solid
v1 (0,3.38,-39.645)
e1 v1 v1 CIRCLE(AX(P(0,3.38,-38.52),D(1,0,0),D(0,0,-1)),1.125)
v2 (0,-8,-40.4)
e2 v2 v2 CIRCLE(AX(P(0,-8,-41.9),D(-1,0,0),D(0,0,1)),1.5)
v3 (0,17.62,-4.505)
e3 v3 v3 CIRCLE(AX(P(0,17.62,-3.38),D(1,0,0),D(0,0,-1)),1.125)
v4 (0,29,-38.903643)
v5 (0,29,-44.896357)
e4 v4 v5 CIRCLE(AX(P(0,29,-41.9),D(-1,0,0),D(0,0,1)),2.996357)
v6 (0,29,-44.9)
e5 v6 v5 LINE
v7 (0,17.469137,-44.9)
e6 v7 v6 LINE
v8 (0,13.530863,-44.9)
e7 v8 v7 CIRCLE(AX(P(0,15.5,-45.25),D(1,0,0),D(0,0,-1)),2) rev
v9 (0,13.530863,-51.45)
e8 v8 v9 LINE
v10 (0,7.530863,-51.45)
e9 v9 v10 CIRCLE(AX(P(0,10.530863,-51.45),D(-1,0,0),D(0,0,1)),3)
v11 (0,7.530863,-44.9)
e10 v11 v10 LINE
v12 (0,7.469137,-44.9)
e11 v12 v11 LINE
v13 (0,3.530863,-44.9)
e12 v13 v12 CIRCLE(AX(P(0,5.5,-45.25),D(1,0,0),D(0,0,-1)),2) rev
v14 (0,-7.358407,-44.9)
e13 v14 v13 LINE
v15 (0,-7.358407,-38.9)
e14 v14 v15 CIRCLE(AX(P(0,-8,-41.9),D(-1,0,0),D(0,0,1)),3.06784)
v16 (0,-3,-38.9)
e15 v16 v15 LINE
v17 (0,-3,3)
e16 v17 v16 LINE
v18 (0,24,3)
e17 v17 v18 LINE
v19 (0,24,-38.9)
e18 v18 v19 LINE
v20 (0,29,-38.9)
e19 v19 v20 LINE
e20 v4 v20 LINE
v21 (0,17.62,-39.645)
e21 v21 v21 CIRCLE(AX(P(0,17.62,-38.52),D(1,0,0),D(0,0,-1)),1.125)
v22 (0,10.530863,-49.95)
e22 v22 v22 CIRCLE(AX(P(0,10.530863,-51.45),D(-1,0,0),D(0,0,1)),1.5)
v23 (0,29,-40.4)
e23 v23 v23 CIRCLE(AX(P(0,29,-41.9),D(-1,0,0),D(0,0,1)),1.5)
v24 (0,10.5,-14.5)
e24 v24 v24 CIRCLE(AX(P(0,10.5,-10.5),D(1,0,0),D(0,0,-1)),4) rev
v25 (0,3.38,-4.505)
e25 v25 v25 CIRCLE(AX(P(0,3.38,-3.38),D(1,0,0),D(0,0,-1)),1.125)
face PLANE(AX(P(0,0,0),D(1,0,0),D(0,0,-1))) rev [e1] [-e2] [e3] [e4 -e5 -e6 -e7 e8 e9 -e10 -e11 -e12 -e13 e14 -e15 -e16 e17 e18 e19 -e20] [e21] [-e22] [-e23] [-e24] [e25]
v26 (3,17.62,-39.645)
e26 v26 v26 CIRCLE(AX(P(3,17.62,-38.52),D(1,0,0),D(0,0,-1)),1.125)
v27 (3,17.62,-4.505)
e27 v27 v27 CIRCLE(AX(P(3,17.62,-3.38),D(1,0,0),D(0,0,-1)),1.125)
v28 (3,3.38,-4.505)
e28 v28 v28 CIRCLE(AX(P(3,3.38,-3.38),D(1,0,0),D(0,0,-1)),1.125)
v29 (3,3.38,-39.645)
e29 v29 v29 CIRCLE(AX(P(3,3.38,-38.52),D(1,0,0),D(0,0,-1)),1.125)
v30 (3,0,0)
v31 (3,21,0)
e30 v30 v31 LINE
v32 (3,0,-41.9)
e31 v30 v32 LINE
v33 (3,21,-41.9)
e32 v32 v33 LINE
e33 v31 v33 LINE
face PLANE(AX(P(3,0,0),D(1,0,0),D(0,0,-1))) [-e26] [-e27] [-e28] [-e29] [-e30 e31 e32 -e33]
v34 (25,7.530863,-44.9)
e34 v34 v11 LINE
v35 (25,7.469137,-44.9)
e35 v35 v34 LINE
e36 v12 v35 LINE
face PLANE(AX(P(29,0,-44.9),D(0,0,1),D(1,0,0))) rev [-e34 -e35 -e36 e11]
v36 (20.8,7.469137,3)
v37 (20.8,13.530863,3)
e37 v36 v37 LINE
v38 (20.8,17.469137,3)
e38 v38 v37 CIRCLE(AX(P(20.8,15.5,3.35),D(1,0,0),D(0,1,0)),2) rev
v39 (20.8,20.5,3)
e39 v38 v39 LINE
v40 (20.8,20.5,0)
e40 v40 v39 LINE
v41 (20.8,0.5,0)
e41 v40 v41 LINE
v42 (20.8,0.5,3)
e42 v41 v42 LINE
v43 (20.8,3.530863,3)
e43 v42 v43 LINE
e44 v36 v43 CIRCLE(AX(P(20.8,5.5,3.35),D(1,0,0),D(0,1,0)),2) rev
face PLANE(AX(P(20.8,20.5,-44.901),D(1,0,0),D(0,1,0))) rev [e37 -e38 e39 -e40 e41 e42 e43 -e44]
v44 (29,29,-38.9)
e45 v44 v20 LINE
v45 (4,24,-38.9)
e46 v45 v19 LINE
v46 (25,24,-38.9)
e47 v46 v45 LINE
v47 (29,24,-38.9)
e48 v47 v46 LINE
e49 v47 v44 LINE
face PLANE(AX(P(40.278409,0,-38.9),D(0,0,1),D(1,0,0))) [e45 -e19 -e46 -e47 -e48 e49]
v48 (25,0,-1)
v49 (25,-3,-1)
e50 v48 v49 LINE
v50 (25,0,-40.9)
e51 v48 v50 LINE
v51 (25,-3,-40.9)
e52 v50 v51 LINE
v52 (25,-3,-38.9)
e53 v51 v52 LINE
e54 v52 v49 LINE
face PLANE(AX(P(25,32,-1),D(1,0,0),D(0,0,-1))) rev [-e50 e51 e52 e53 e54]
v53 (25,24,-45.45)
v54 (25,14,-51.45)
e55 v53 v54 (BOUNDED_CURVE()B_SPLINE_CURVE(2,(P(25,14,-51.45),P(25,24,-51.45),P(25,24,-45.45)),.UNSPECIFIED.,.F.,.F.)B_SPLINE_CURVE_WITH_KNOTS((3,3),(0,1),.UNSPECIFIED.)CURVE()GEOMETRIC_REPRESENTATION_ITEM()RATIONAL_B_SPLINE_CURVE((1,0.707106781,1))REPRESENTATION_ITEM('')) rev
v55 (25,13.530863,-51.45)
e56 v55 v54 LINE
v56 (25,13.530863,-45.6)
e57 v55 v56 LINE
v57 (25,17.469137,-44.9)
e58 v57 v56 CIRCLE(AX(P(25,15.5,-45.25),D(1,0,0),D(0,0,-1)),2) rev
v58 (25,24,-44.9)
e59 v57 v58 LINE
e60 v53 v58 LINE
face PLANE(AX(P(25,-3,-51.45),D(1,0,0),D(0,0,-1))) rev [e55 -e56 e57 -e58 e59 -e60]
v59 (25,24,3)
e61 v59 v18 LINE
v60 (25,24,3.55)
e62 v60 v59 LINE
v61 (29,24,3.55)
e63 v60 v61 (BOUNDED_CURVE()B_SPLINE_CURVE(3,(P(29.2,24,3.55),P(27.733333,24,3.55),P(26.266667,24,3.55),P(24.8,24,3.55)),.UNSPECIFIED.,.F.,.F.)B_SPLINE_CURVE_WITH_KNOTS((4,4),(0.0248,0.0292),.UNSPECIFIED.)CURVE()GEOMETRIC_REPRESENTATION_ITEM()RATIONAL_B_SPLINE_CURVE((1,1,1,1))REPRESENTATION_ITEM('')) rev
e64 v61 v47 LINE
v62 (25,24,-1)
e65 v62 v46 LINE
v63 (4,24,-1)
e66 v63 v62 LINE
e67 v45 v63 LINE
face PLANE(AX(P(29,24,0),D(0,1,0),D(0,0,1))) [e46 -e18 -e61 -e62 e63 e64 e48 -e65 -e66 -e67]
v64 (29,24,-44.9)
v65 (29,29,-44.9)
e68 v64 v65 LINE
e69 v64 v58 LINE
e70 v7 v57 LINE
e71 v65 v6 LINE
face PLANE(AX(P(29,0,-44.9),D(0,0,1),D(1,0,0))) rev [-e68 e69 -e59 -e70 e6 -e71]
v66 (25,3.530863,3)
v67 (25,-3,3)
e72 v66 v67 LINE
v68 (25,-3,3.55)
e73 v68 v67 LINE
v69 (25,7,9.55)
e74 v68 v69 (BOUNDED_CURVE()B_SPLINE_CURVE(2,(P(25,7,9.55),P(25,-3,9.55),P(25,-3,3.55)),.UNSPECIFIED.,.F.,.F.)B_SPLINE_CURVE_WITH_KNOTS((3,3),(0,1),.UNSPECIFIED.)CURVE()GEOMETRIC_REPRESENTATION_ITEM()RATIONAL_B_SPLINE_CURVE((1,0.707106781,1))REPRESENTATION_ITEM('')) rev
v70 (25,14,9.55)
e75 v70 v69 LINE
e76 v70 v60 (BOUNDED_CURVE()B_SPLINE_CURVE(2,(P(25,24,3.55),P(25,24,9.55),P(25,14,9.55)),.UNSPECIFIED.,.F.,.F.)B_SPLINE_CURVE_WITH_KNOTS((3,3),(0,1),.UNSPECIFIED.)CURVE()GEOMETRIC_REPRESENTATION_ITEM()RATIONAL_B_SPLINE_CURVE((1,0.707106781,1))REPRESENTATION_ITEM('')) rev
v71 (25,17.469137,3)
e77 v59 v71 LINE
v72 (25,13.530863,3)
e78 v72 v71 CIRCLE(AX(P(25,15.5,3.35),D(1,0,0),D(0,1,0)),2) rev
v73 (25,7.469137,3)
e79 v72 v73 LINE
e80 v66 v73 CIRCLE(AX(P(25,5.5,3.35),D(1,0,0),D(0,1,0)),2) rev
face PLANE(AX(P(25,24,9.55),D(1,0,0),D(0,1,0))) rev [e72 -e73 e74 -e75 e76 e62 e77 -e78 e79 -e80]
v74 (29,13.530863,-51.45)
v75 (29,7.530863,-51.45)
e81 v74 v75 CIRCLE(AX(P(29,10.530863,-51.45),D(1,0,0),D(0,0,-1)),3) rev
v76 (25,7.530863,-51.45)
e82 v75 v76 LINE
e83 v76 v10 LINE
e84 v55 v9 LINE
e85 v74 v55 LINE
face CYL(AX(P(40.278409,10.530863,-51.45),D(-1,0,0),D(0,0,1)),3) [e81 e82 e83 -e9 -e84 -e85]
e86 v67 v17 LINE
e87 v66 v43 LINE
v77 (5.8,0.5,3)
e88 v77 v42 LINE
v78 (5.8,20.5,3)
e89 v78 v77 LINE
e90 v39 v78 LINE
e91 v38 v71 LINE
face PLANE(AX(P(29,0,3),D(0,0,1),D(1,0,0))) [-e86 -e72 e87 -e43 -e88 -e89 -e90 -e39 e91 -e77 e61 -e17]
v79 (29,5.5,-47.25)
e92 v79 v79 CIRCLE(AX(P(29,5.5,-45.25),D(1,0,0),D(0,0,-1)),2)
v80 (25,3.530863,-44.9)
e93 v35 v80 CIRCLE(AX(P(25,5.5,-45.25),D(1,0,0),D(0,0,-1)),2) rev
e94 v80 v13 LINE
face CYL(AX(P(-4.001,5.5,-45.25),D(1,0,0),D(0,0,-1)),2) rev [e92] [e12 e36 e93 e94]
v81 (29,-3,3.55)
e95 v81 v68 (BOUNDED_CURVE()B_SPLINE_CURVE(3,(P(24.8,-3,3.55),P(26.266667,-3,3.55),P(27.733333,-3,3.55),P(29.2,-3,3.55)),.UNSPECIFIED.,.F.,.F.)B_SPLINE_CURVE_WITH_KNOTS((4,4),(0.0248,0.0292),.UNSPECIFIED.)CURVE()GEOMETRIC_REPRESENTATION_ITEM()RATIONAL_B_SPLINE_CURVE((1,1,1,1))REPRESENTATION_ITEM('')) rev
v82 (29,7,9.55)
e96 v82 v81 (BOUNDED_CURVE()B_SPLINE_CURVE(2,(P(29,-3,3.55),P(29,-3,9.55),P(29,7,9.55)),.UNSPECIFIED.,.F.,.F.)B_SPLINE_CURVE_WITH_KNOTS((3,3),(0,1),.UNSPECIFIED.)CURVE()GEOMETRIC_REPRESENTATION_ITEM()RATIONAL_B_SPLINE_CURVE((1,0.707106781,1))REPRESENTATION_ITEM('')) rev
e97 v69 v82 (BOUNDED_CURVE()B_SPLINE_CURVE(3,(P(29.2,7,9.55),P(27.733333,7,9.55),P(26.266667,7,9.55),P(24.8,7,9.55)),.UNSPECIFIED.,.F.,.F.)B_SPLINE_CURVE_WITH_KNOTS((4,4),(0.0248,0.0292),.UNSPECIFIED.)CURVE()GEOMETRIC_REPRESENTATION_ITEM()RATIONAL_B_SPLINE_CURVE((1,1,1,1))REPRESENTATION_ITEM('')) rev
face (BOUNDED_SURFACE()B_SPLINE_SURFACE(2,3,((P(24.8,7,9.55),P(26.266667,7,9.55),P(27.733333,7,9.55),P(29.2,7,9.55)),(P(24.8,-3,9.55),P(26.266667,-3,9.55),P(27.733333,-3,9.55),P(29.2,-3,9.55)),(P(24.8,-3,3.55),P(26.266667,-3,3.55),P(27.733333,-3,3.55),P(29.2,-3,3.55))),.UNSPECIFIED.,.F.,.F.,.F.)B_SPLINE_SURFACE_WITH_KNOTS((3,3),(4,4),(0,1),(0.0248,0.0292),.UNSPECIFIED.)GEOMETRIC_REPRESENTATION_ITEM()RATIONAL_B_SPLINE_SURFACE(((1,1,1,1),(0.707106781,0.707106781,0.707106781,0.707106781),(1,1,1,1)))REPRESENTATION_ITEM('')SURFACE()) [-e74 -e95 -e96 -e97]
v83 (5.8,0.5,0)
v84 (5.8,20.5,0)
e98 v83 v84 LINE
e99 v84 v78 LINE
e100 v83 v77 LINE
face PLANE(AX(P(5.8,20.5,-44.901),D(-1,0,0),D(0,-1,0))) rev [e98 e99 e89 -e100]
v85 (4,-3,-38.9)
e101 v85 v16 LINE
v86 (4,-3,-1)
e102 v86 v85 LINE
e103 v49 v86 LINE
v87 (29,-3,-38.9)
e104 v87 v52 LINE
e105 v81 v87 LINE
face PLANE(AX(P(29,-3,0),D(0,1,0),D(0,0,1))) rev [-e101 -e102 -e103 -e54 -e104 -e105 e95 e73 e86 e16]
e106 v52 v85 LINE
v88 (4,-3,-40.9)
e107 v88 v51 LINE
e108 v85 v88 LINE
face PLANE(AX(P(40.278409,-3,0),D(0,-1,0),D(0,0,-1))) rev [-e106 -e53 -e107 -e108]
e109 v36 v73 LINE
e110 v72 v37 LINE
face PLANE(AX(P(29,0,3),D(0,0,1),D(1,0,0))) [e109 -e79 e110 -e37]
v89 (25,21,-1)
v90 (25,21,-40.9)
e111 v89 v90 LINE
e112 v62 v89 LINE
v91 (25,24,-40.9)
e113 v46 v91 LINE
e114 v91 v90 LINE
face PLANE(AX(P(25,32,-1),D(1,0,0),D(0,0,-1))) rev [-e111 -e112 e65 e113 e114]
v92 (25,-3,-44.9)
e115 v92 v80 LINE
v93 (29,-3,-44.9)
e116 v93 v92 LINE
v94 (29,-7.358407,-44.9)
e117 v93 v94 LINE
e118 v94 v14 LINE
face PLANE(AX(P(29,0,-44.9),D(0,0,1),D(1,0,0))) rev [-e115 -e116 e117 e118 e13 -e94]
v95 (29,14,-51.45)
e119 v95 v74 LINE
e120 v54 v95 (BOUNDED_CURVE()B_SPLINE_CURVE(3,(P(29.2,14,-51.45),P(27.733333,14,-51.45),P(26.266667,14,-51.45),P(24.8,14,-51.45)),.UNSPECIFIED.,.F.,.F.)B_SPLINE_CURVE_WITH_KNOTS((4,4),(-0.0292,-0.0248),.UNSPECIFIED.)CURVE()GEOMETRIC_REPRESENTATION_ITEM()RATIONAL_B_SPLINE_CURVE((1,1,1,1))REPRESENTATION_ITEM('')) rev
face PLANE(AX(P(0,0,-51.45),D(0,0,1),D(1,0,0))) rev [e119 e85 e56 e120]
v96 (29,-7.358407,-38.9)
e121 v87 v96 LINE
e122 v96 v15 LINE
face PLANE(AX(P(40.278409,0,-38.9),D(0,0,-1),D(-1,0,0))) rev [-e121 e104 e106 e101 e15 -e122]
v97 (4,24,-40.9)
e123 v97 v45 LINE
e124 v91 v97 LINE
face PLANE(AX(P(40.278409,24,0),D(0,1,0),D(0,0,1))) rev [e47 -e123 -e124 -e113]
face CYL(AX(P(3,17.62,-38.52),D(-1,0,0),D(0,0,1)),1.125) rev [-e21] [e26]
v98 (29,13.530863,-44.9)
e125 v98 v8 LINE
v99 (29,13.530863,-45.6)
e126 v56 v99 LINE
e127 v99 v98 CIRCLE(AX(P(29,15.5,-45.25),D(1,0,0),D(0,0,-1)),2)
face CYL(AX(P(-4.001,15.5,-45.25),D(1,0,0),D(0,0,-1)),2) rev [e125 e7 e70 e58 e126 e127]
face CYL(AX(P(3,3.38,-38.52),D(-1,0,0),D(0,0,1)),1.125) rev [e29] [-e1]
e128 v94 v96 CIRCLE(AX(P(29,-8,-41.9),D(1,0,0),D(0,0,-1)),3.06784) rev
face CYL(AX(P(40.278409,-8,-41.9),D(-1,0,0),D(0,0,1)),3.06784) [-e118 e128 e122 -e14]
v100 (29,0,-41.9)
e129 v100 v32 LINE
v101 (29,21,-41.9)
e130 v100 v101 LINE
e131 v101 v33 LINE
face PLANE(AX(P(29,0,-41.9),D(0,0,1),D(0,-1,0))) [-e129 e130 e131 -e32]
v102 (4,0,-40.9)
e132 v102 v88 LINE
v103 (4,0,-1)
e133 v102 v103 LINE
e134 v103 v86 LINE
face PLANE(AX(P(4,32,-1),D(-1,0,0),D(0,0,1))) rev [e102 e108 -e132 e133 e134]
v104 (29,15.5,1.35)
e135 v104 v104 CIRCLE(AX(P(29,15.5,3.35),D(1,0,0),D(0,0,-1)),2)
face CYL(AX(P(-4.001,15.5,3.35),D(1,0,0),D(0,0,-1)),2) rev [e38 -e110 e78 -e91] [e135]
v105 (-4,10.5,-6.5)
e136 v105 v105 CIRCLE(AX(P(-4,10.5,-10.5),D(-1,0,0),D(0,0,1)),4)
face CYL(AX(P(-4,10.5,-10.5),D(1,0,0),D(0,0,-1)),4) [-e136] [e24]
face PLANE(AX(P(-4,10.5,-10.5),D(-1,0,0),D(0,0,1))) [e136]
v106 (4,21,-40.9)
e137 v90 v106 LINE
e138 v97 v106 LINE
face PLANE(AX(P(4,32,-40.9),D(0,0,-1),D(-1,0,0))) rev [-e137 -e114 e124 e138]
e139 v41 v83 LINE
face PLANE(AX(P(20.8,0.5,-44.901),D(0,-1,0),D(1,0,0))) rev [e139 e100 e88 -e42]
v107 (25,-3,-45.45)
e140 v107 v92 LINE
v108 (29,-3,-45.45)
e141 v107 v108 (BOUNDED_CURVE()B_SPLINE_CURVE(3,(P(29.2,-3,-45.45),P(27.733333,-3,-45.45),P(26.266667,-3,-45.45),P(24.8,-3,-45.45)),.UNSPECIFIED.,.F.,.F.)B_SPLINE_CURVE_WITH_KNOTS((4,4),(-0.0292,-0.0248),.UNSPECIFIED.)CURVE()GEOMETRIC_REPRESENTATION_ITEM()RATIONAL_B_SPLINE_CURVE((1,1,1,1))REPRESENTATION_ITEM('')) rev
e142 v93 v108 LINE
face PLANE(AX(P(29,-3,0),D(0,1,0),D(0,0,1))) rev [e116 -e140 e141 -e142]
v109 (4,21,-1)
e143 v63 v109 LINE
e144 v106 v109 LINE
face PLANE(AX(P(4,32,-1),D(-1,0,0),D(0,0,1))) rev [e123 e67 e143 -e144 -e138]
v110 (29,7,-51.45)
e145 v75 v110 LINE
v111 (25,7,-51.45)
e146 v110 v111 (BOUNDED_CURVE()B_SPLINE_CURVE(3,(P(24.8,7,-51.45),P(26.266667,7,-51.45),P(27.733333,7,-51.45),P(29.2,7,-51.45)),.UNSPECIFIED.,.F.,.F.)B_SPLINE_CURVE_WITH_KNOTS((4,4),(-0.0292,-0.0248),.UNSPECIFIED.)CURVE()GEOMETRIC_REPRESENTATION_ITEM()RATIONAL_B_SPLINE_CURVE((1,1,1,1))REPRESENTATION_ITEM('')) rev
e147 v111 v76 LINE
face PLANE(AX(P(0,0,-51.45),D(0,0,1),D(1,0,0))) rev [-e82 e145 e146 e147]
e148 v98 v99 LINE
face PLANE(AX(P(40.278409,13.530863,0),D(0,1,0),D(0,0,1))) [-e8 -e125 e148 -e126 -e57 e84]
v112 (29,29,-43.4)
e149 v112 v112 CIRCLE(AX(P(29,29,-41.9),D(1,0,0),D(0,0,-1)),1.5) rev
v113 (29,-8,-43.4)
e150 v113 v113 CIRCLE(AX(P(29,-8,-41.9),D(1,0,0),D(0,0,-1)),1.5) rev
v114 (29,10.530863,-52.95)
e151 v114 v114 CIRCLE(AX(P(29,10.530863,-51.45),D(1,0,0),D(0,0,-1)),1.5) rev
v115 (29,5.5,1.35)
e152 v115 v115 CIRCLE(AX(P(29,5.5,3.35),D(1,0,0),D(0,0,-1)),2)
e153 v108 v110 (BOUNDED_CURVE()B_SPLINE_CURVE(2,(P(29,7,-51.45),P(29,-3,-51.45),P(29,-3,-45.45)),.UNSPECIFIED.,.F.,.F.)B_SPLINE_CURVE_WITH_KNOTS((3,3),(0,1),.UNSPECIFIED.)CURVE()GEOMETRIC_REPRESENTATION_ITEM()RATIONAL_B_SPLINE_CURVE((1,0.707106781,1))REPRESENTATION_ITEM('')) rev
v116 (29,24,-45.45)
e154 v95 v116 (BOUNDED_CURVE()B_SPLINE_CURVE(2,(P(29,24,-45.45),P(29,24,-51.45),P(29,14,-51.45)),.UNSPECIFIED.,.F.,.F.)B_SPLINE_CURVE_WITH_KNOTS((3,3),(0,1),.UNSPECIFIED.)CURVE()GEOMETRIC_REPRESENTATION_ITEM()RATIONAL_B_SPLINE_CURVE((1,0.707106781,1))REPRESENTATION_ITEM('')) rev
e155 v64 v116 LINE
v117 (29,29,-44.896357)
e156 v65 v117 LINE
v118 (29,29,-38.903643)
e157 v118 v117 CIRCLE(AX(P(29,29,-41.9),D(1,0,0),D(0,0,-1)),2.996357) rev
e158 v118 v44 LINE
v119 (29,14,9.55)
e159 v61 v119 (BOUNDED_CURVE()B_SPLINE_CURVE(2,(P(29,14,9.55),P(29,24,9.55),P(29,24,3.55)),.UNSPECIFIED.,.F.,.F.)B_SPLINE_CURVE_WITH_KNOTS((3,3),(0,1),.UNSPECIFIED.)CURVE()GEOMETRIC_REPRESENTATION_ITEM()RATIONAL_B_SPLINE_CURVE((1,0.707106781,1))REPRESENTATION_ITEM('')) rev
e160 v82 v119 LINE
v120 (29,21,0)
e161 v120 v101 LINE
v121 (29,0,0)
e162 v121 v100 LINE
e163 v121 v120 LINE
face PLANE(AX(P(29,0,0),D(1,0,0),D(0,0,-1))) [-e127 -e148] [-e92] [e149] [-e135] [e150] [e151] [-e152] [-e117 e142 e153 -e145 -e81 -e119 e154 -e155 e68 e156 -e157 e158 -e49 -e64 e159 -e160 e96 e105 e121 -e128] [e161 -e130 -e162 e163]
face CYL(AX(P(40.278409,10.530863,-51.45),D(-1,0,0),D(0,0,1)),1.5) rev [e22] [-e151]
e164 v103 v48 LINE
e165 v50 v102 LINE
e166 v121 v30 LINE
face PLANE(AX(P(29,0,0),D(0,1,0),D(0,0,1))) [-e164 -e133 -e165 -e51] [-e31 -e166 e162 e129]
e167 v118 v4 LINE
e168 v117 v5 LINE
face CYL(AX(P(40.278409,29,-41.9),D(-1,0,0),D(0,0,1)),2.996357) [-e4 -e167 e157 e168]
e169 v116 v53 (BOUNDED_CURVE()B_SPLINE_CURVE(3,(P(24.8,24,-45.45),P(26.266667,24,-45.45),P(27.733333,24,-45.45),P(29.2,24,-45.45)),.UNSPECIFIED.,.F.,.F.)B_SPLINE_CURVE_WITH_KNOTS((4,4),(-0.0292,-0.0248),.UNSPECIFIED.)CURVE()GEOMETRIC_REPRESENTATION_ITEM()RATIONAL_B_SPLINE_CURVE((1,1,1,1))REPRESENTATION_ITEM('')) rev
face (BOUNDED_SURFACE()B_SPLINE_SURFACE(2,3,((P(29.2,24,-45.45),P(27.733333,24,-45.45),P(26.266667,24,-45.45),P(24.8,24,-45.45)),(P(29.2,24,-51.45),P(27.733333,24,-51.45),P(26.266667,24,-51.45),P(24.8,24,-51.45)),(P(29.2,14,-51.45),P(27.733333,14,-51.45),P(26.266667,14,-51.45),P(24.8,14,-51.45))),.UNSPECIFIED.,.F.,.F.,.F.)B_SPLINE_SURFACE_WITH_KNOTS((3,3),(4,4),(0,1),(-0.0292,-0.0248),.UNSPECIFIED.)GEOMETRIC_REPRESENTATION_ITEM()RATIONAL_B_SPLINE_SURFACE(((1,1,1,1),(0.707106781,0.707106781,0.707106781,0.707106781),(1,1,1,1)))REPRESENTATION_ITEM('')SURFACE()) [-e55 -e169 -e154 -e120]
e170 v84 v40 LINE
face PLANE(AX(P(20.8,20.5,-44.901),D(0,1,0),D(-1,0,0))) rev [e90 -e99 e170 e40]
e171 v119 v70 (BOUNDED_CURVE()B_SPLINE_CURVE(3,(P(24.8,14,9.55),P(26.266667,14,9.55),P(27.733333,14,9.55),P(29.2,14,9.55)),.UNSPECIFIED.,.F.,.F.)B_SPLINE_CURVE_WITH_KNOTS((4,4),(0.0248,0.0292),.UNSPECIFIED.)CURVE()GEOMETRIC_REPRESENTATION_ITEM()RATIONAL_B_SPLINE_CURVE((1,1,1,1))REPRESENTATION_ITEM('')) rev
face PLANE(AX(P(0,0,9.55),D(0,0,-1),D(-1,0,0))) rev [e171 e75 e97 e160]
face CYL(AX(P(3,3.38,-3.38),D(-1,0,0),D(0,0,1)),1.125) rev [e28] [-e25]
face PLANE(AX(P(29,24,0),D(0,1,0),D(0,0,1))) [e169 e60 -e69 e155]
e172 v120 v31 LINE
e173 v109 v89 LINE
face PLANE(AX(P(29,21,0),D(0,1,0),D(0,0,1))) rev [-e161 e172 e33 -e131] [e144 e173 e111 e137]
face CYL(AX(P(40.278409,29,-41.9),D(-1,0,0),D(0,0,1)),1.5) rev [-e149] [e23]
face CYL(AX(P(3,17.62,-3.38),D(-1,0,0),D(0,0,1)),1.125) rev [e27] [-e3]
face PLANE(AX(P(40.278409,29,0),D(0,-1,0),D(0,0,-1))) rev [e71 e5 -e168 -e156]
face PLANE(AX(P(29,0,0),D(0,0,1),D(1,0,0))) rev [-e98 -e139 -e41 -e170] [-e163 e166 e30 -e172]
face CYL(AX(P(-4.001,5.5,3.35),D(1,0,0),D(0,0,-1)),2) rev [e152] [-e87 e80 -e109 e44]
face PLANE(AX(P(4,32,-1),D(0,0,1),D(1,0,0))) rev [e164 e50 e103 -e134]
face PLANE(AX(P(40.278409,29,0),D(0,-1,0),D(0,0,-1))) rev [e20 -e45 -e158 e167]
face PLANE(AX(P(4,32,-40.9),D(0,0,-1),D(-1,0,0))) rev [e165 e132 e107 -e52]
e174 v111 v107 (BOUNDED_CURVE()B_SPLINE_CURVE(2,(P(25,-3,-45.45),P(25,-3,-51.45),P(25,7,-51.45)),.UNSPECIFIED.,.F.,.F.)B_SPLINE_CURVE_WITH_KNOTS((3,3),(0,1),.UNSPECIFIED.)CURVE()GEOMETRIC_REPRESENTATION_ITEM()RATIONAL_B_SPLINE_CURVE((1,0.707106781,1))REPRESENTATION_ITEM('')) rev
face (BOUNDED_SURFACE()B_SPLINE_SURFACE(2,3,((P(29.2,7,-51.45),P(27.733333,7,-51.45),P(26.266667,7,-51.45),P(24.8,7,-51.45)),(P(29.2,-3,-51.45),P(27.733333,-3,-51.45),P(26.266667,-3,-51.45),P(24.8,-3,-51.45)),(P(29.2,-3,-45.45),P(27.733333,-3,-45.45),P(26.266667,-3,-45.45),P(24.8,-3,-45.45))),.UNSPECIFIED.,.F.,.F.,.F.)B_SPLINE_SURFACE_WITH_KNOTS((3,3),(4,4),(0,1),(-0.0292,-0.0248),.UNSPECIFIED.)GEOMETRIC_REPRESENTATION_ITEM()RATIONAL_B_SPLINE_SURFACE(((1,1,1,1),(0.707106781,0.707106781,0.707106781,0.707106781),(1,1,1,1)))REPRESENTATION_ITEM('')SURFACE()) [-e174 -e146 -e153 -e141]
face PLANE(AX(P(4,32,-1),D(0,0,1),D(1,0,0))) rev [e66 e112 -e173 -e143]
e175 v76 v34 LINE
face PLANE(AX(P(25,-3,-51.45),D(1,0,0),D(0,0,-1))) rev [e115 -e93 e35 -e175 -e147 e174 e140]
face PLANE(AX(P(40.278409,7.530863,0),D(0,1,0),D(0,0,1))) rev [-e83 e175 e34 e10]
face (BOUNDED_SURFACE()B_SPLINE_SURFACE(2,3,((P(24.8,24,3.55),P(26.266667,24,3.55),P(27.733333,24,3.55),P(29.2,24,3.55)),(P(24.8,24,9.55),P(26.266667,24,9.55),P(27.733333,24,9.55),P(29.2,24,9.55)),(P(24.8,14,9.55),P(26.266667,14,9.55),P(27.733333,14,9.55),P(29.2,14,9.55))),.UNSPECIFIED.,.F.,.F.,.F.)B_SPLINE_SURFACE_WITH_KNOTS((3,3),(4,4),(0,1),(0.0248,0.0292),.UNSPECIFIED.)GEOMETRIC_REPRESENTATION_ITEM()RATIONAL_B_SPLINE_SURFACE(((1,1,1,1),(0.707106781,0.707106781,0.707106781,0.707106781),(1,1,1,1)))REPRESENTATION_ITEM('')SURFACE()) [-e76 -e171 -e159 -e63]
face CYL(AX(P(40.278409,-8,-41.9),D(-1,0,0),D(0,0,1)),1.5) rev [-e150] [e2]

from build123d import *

# Parameters (mm, degrees)
SKETCH1_W            = 41.9
SKETCH1_H            = 21
SKETCH1_R            = 1.125
BOSS_EXTRUDE1_DEPTH  = 3
SKETCH1_3_W          = 47.9
SKETCH1_3_H          = 27
SKETCH1_3_W_2        = 41.9
SKETCH1_3_H_2        = 21
BOSS_EXTRUDE2_DEPTH  = 29
CUT_EXTRUDE1_REACH   = 62.921
SKETCH2_W            = 15
SKETCH2_H            = 20
SKETCH4_W            = 21
SKETCH4_H            = 39.9
CUT_EXTRUDE2_DEPTH   = 35
SKETCH5_R            = 4
BOSS_EXTRUDE3_DEPTH  = 4
SKETCH6_W            = 4
SKETCH6_H            = 27
BOSS_EXTRUDE4_DEPTH  = 6.55
SKETCH7_W            = 4
SKETCH7_H            = 27
BOSS_EXTRUDE5_DEPTH  = 6.55
CUT_EXTRUDE3_REACH   = 67.667
SKETCH10_R           = 2
BOSS_EXTRUDE10_REACH = 65.75
SKETCH11_R           = 1.5
FILLET3_SIZE         = 10
FILLET3_SIZE_2       = 6
CUT_EXTRUDE4_REACH   = 73.257
SKETCH12_R           = 1.5


with BuildPart() as part:
    # Sketch1 → Boss-Extrude1 (new body)
    with BuildSketch(Plane(origin=(0, 0, 0), x_dir=(0, 0, -1), z_dir=(1, 0, 0))):
        with Locations((20.95, 10.5)):
            Rectangle(SKETCH1_W, SKETCH1_H)
        with Locations((38.52, 17.62)):
            Circle(SKETCH1_R, mode=Mode.SUBTRACT)
        with Locations((38.52, 3.38)):
            Circle(SKETCH1_R, mode=Mode.SUBTRACT)
        with Locations((3.38, 17.62)):
            Circle(SKETCH1_R, mode=Mode.SUBTRACT)
        with Locations((3.38, 3.38)):
            Circle(SKETCH1_R, mode=Mode.SUBTRACT)
    extrude(amount=BOSS_EXTRUDE1_DEPTH)

    # Sketch1<3> → Boss-Extrude2 (add)
    with BuildSketch(Plane(origin=(0, 0, 0), x_dir=(0, 0, -1), z_dir=(1, 0, 0))):
        with Locations((20.95, 10.5)):
            Rectangle(SKETCH1_3_W, SKETCH1_3_H)
        with Locations((20.95, 10.5)):
            Rectangle(SKETCH1_3_W_2, SKETCH1_3_H_2, mode=Mode.SUBTRACT)
    extrude(amount=BOSS_EXTRUDE2_DEPTH)

    # Sketch2 → Cut-Extrude1 (cut, up to next)
    with BuildSketch(Plane.XY.offset(3), mode=Mode.PRIVATE) as cut_extrude1_sk1:
        with Locations((13.3, 10.5)):
            Rectangle(SKETCH2_W, SKETCH2_H)
    cut_extrude1_tool1 = extrude(cut_extrude1_sk1.sketch, amount=-CUT_EXTRUDE1_REACH, mode=Mode.PRIVATE) & part.part
    add(cut_extrude1_tool1.solids().sort_by_distance((13.3, 10.5, 3))[0], mode=Mode.SUBTRACT)

    # Sketch4 → Cut-Extrude2 (cut)
    with BuildSketch(Plane.XZ.offset(3)):
        with Locations((14.5, -20.95)):
            Rectangle(SKETCH4_W, SKETCH4_H)
    extrude(amount=-CUT_EXTRUDE2_DEPTH, mode=Mode.SUBTRACT)

    # Sketch5 → Boss-Extrude3 (add)
    with BuildSketch(Plane.ZY):
        with Locations(Location((-10.5, 10.5, 0), (0, 0, 180))):
            Circle(SKETCH5_R)
    extrude(amount=BOSS_EXTRUDE3_DEPTH)

    # Sketch6 → Boss-Extrude4 (add)
    with BuildSketch(Plane(origin=(0, 0, -44.9), x_dir=(-1, 0, 0), z_dir=(0, 0, -1))):
        with Locations((-27, 10.5)):
            Rectangle(SKETCH6_W, SKETCH6_H)
    extrude(amount=BOSS_EXTRUDE4_DEPTH)

    # Sketch7 → Boss-Extrude5 (add)
    with BuildSketch(Plane.XY.offset(3)):
        with Locations((27, 10.5)):
            Rectangle(SKETCH7_W, SKETCH7_H)
    extrude(amount=BOSS_EXTRUDE5_DEPTH)

    # Sketch10 → Cut-Extrude3 (cut, up to next)
    with BuildSketch(Plane(origin=(29, 0, 0), x_dir=(0, 0, -1), z_dir=(1, 0, 0)), mode=Mode.PRIVATE) as cut_extrude3_sk1:
        with Locations((-3.35, 15.5)):
            Circle(SKETCH10_R)
    cut_extrude3_tool1 = extrude(cut_extrude3_sk1.sketch, amount=-CUT_EXTRUDE3_REACH, mode=Mode.PRIVATE) & part.part
    # Sketch10 → Cut-Extrude3 (cut, up to next)
    with BuildSketch(Plane(origin=(29, 0, 0), x_dir=(0, 0, -1), z_dir=(1, 0, 0)), mode=Mode.PRIVATE) as cut_extrude3_sk2:
        with Locations((-3.35, 5.5)):
            Circle(SKETCH10_R)
    cut_extrude3_tool2 = extrude(cut_extrude3_sk2.sketch, amount=-CUT_EXTRUDE3_REACH, mode=Mode.PRIVATE) & part.part
    # Sketch10 → Cut-Extrude3 (cut, up to next)
    with BuildSketch(Plane(origin=(29, 0, 0), x_dir=(0, 0, -1), z_dir=(1, 0, 0)), mode=Mode.PRIVATE) as cut_extrude3_sk3:
        with Locations((45.25, 5.5)):
            Circle(SKETCH10_R)
    cut_extrude3_tool3 = extrude(cut_extrude3_sk3.sketch, amount=-CUT_EXTRUDE3_REACH, mode=Mode.PRIVATE) & part.part
    # Sketch10 → Cut-Extrude3 (cut, up to next)
    with BuildSketch(Plane(origin=(29, 0, 0), x_dir=(0, 0, -1), z_dir=(1, 0, 0)), mode=Mode.PRIVATE) as cut_extrude3_sk4:
        with Locations((45.25, 15.5)):
            Circle(SKETCH10_R)
    cut_extrude3_tool4 = extrude(cut_extrude3_sk4.sketch, amount=-CUT_EXTRUDE3_REACH, mode=Mode.PRIVATE) & part.part
    add(cut_extrude3_tool1.solids().sort_by_distance((29, 15.5, 3.35))[0], mode=Mode.SUBTRACT)
    add(cut_extrude3_tool2.solids().sort_by_distance((29, 5.5, 3.35))[0], mode=Mode.SUBTRACT)
    add(cut_extrude3_tool3.solids().sort_by_distance((29, 5.5, -45.25))[0], mode=Mode.SUBTRACT)
    add(cut_extrude3_tool4.solids().sort_by_distance((29, 15.5, -45.25))[0], mode=Mode.SUBTRACT)

    # Boss-Extrude10: up to this face of the body (flat: up to its plane)
    boss_extrude10_end = Plane(part.part.faces().sort_by_distance((29, 10.5, -50.782916797))[0])
    # Sketch11 → Boss-Extrude10 (add, up to the picked face)
    with BuildSketch(Plane.ZY, mode=Mode.PRIVATE) as boss_extrude10_sk1:
        with BuildLine():
            Line((-44.9, 29), (-44.9, 24))
            Line((-44.9, 24), (-38.9, 24))
            Line((-38.9, 24), (-38.9, 29))
            Line((-38.9, 29), (-38.903642649, 29))
            ThreePointArc((-38.903642649, 29), (-41.9, 31.996357351), (-44.896357351, 29))
            Line((-44.896357351, 29), (-44.9, 29))
        make_face()
        with Locations((-41.9, 29)):
            Circle(SKETCH11_R, mode=Mode.SUBTRACT)
    boss_extrude10_tool1 = split(extrude(boss_extrude10_sk1.sketch, amount=-BOSS_EXTRUDE10_REACH, mode=Mode.PRIVATE), bisect_by=boss_extrude10_end, keep=Keep.BOTH, mode=Mode.PRIVATE)
    # Sketch11 → Boss-Extrude10 (add, up to the picked face)
    with BuildSketch(Plane.ZY, mode=Mode.PRIVATE) as boss_extrude10_sk2:
        with BuildLine():
            Line((-44.9, 7.530863133), (-44.9, 13.530863133))
            Line((-44.9, 13.530863133), (-51.45, 13.530863133))
            ThreePointArc((-51.45, 13.530863133), (-54.45, 10.530863133), (-51.45, 7.530863133))
            Line((-51.45, 7.530863133), (-44.9, 7.530863133))
        make_face()
        with Locations((-51.45, 10.530863133)):
            Circle(SKETCH11_R, mode=Mode.SUBTRACT)
    boss_extrude10_tool2 = split(extrude(boss_extrude10_sk2.sketch, amount=-BOSS_EXTRUDE10_REACH, mode=Mode.PRIVATE), bisect_by=boss_extrude10_end, keep=Keep.BOTH, mode=Mode.PRIVATE)
    # Sketch11 → Boss-Extrude10 (add, up to the picked face)
    with BuildSketch(Plane.ZY, mode=Mode.PRIVATE) as boss_extrude10_sk3:
        with BuildLine():
            Line((-38.9, -3), (-44.9, -3))
            Line((-44.9, -3), (-44.9, -7.358406619))
            ThreePointArc((-44.9, -7.358406619), (-41.9, -11.067839968), (-38.9, -7.358406619))
            Line((-38.9, -7.358406619), (-38.9, -3))
        make_face()
        with Locations((-41.9, -8)):
            Circle(SKETCH11_R, mode=Mode.SUBTRACT)
    boss_extrude10_tool3 = split(extrude(boss_extrude10_sk3.sketch, amount=-BOSS_EXTRUDE10_REACH, mode=Mode.PRIVATE), bisect_by=boss_extrude10_end, keep=Keep.BOTH, mode=Mode.PRIVATE)
    add(boss_extrude10_tool1.solids().sort_by(Axis((0, 27.459117, -41.9), (1, 0, 0)))[0])
    add(boss_extrude10_tool2.solids().sort_by(Axis((0, 10.530863, -49.062446), (1, 0, 0)))[0])
    add(boss_extrude10_tool3.solids().sort_by(Axis((0, -5.179203, -39.001359), (1, 0, 0)))[0])

    # Fillet3
    # an asymmetric fillet: 10, 6 mm, written as the material it takes off along each edge
    with BuildSketch(Plane(origin=(54, 24, 9.55), x_dir=(0, -1, 0), z_dir=(-1, 0, 0)), Plane(origin=(0, 24, -51.45), x_dir=(0, -1, 0), z_dir=(1, 0, 0))) as fillet3_piece_1:
        with BuildLine():
            Bezier((FILLET3_SIZE, 0), (0, 0), (0, -FILLET3_SIZE_2), weights=[1, 0.707106781, 1])
            Line((0, -FILLET3_SIZE_2), (0, 0))
            Line((0, 0), (FILLET3_SIZE, 0))
        make_face()
    extrude(amount=54, mode=Mode.SUBTRACT)
    with BuildSketch(Plane(origin=(0, -3, 9.55), x_dir=(0, 0, -1), z_dir=(1, 0, 0)), Plane(origin=(54, -3, -51.45), x_dir=(0, 0, 1), z_dir=(-1, 0, 0))) as fillet3_piece_2:
        with BuildLine():
            Bezier((FILLET3_SIZE_2, 0), (0, 0), (0, FILLET3_SIZE), weights=[1, 0.707106781, 1])
            Line((0, FILLET3_SIZE), (0, 0))
            Line((0, 0), (FILLET3_SIZE_2, 0))
        make_face()
    extrude(amount=54, mode=Mode.SUBTRACT)

    # Sketch12 → Cut-Extrude4 (cut, up to next)
    with BuildSketch(Plane(origin=(29, 0, 0), x_dir=(0, 0, -1), z_dir=(1, 0, 0)), mode=Mode.PRIVATE) as cut_extrude4_sk1:
        with Locations(Location((51.45, 10.530863133, 0), (0, 0, 180))):
            Circle(SKETCH12_R)
    cut_extrude4_tool1 = extrude(cut_extrude4_sk1.sketch, amount=-CUT_EXTRUDE4_REACH, mode=Mode.PRIVATE) & part.part
    add(cut_extrude4_tool1.solids().sort_by_distance((29, 10.530863, -51.45))[0], mode=Mode.SUBTRACT)


solid = part.part
